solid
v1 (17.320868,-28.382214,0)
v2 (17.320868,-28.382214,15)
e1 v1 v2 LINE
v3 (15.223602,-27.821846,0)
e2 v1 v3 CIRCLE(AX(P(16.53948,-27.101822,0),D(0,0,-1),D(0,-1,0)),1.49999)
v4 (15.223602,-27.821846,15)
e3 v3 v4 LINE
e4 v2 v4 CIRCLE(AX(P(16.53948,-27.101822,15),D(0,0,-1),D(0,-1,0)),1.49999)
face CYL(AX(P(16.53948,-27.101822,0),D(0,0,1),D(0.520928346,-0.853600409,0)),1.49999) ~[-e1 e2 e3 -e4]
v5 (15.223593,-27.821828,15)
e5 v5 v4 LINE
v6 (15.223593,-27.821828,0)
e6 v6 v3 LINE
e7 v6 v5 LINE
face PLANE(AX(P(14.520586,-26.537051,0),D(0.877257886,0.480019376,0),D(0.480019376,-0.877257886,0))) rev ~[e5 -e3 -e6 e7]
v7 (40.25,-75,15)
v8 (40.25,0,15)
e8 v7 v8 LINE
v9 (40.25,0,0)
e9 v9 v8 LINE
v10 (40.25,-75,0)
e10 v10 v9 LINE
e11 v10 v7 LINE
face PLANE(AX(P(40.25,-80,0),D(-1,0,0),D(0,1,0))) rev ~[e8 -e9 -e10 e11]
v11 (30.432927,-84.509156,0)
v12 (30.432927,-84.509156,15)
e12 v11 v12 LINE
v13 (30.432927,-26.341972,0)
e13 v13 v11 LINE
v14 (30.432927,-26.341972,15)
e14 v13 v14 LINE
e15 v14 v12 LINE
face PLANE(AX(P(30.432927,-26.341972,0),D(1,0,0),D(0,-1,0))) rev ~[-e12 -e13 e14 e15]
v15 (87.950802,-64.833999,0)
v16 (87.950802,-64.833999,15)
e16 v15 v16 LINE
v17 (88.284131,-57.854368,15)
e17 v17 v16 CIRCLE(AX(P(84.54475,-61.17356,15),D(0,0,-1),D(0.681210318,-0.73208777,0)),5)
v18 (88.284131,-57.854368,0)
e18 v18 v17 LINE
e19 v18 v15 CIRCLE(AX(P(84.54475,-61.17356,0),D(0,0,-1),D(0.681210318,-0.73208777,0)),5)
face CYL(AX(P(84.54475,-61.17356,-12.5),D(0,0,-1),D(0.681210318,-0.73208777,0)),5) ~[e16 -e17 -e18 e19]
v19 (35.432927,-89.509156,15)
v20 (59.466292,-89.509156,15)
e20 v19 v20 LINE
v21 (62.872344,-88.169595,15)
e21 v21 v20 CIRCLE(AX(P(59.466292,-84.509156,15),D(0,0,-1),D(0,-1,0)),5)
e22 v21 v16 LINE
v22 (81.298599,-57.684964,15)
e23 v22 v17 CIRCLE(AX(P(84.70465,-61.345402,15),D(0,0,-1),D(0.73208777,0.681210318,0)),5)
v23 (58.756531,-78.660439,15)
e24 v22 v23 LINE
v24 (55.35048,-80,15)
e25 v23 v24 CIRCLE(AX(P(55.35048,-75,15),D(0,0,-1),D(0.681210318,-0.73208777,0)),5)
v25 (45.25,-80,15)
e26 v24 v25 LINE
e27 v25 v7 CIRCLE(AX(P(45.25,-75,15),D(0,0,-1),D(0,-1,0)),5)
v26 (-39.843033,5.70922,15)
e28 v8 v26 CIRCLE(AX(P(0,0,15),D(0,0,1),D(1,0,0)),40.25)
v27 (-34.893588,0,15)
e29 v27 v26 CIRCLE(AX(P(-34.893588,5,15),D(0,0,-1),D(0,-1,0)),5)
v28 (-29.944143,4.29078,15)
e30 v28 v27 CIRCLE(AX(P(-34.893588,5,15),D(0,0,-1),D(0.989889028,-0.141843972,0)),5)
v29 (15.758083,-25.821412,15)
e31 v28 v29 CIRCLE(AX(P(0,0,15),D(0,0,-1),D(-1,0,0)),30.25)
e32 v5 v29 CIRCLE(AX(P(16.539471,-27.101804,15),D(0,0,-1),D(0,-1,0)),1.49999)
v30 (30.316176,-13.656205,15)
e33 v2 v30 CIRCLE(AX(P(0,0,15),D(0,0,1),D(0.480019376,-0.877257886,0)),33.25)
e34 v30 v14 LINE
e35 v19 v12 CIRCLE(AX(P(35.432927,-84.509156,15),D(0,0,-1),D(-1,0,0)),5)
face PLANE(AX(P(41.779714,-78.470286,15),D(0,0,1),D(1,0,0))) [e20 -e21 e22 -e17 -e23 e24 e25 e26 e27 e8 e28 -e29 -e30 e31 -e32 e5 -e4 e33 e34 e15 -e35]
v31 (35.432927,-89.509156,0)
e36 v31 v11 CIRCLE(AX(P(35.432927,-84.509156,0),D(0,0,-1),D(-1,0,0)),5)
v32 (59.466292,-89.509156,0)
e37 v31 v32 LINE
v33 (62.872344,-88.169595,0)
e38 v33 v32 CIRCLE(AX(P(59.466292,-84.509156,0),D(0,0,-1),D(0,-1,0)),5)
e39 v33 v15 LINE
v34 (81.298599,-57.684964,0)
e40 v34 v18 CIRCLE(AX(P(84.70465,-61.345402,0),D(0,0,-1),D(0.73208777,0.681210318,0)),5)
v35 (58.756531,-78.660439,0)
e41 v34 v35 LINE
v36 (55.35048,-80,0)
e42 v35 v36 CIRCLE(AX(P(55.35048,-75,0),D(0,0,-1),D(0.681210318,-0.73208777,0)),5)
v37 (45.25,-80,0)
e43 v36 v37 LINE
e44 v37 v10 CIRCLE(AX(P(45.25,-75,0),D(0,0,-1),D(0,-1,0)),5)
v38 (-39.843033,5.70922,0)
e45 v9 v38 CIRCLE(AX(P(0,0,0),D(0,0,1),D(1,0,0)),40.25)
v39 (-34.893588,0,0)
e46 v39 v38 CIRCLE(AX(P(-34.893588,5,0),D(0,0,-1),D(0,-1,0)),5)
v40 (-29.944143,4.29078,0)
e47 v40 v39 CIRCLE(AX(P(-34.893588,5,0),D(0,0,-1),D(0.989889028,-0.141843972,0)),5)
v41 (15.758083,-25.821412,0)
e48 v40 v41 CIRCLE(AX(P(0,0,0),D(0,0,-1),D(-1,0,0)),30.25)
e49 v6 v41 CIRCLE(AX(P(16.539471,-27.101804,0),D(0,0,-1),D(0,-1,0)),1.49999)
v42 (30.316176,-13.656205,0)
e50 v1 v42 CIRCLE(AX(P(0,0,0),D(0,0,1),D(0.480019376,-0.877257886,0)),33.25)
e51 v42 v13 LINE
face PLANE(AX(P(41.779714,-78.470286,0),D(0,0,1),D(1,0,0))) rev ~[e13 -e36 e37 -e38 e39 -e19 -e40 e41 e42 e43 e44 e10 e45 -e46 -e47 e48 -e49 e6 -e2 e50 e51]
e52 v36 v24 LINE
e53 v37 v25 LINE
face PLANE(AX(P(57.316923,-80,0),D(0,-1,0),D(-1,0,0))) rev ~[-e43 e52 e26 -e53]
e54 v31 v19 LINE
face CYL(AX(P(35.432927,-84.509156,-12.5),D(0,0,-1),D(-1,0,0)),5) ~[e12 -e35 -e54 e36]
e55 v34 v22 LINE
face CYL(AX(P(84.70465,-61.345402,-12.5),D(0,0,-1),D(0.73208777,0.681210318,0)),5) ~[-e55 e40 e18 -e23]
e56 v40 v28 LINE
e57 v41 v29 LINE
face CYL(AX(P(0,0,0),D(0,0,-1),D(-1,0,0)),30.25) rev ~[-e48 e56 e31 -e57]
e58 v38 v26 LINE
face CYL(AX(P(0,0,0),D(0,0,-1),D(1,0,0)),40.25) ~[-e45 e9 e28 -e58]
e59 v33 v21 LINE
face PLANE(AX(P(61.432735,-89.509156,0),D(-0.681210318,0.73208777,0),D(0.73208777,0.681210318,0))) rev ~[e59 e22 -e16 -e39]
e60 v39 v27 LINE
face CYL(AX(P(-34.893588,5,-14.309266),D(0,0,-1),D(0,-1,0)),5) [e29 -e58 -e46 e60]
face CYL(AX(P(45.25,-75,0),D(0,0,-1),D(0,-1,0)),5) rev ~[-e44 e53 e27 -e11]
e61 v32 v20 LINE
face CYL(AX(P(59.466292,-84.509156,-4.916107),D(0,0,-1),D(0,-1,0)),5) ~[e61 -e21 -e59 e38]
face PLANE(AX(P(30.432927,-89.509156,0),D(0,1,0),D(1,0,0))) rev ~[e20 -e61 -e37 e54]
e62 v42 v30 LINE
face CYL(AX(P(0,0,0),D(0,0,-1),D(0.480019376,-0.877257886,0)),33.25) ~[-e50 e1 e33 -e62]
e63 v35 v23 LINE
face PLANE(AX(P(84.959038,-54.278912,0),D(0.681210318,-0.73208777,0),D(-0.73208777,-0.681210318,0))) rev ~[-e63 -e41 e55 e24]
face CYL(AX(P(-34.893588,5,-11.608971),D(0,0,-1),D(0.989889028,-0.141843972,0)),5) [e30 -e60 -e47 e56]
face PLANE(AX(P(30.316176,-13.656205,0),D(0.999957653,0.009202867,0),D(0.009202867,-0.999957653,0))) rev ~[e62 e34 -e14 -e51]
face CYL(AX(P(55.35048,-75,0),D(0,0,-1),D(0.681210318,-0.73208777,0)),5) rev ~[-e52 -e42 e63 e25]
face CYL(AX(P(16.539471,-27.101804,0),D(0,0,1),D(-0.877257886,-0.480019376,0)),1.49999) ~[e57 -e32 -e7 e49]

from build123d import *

# Parameters (mm, degrees)
F1_DEPTH    = 15
F2_T1_DEPTH = 15
F2_T3_DEPTH = 38.2179411812
F2_T5_DEPTH = 43.6185312436
F2_T7_DEPTH = 40
F2_T9_DEPTH = 24.832214185
F3_R        = 1.49999


# Not quite as in the source:
# - a fillet or chamfer that OpenCascade refuses, or shapes differently, is made with other operations: its cross-section is extruded or revolved along the edge and cut away or added
# - a fillet or chamfer is up to 0.001 mm smaller than in the source, because OpenCascade refuses the exact size


with BuildPart() as f1:
    # F0 (on Top) → F1 (new body)
    with BuildSketch(Plane.XY):
        with BuildLine():
            ThreePointArc((-30.25, 0), (15.4242466579, 26.0222042694), (14.5205861182, -26.5370510567))
            Line((14.5205861182, -26.5370510567), (15.9606442456, -29.1688247152))
            ThreePointArc((15.9606442456, -29.1688247152), (24.4038188383, -22.5835366164), (30.3161764706, -13.6562053369))
            Line((30.3161764706, -13.6562053369), (30.4329268293, -26.3419715398))
            Line((30.4329268293, -26.3419715398), (30.4329268293, -89.5091558098))
            Line((30.4329268293, -89.5091558098), (61.4327350343, -89.5091558098))
            Line((61.4327350343, -89.5091558098), (91.6112407267, -61.4279471198))
            Line((91.6112407267, -61.4279471198), (84.9590376288, -54.2789119314))
            Line((84.9590376288, -54.2789119314), (57.316922531, -80))
            Line((57.316922531, -80), (40.25, -80))
            Line((40.25, -80), (40.25, 0))
            ThreePointArc((40.25, 0), (0, 40.25), (-40.25, 0))
            Line((-40.25, 0), (-30.25, 0))
        make_face()
    extrude(amount=F1_DEPTH)

    # F2: fillet of radius 5 on 8 edges, made by hand

    # F2_s2 → F2_t1 (join)
    with BuildSketch(Plane.XY):
        with BuildLine():
            ThreePointArc((45.25, -80), (41.7144660941, -78.5355339059), (40.25, -75))
            Line((40.25, -75), (40.25, -80))
            Line((40.25, -80), (45.25, -80))
        make_face()
        with BuildLine():
            ThreePointArc((58.7565312825, -78.6604388503), (57.1804804794, -79.6530739437), (55.350479694, -80))
            Line((55.350479694, -80), (57.316922531, -80))
            Line((57.316922531, -80), (58.7565312825, -78.6604388503))
        make_face()
    extrude(amount=F2_T1_DEPTH)

    # F2_s4 → F2_t3 (cut)
    with BuildSketch(Plane.XY.offset(-11.6089705906)):
        with BuildLine():
            ThreePointArc((-29.9441430963, 4.2907801418), (-31.6183858983, 1.2220310158), (-34.8935882362, 0))
            Line((-34.8935882362, 0), (-30.25, 0))
            ThreePointArc((-30.25, 0), (-30.1734388881, 2.1508337146), (-29.9441430963, 4.2907801418))
        make_face()
    extrude(amount=F2_T3_DEPTH, mode=Mode.SUBTRACT)

    # F2_s6 → F2_t5 (cut)
    with BuildSketch(Plane.XY.offset(-14.3092656218)):
        with BuildLine():
            ThreePointArc((-34.8935882362, 0), (-38.6715572204, 1.724797662), (-39.8430333761, 5.7092198582))
            ThreePointArc((-39.8430333761, 5.7092198582), (-40.1481294296, 2.8618531244), (-40.25, 0))
            Line((-40.25, 0), (-34.8935882362, 0))
        make_face()
    extrude(amount=F2_T5_DEPTH, mode=Mode.SUBTRACT)

    # F2_s8 → F2_t7 (cut)
    with BuildSketch(Plane.XY.offset(-12.5)):
        with BuildLine():
            ThreePointArc((88.3650892173, -57.9393507817), (84.8845293249, -56.3486390617), (81.2985987785, -57.6849635199))
            Line((81.2985987785, -57.6849635199), (84.9590376288, -54.2789119314))
            Line((84.9590376288, -54.2789119314), (88.3650892173, -57.9393507817))
        make_face()
        with BuildLine():
            ThreePointArc((87.9508018764, -64.8339987083), (89.5415135964, -61.3534388159), (88.2051891382, -57.7675082695))
            Line((88.2051891382, -57.7675082695), (91.6112407267, -61.4279471198))
            Line((91.6112407267, -61.4279471198), (87.9508018764, -64.8339987083))
        make_face()
        with BuildLine():
            ThreePointArc((30.4329268293, -84.5091558098), (31.8973929233, -88.0446897157), (35.4329268293, -89.5091558098))
            Line((35.4329268293, -89.5091558098), (30.4329268293, -89.5091558098))
            Line((30.4329268293, -89.5091558098), (30.4329268293, -84.5091558098))
        make_face()
    extrude(amount=F2_T7_DEPTH, mode=Mode.SUBTRACT)

    # F2_s10 → F2_t9 (cut)
    with BuildSketch(Plane.XY.offset(-4.9161070925)):
        with BuildLine():
            ThreePointArc((59.4662921973, -89.5091558098), (61.2962929826, -89.1622297535), (62.8723437858, -88.1695946601))
            Line((62.8723437858, -88.1695946601), (61.4327350343, -89.5091558098))
            Line((61.4327350343, -89.5091558098), (59.4662921973, -89.5091558098))
        make_face()
    extrude(amount=F2_T9_DEPTH, mode=Mode.SUBTRACT)

    # F3 (radius 1.5 in the source; OpenCascade refuses exactly that, so slightly less here)
    f3_edges = [f1.edges().sort_by_distance(p)[0] for p in [
        (14.520586, -26.537051, 7.5),
        (15.960644, -29.168825, 7.5),
    ]]
    fillet(f3_edges, radius=F3_R)


solid = f1.part
